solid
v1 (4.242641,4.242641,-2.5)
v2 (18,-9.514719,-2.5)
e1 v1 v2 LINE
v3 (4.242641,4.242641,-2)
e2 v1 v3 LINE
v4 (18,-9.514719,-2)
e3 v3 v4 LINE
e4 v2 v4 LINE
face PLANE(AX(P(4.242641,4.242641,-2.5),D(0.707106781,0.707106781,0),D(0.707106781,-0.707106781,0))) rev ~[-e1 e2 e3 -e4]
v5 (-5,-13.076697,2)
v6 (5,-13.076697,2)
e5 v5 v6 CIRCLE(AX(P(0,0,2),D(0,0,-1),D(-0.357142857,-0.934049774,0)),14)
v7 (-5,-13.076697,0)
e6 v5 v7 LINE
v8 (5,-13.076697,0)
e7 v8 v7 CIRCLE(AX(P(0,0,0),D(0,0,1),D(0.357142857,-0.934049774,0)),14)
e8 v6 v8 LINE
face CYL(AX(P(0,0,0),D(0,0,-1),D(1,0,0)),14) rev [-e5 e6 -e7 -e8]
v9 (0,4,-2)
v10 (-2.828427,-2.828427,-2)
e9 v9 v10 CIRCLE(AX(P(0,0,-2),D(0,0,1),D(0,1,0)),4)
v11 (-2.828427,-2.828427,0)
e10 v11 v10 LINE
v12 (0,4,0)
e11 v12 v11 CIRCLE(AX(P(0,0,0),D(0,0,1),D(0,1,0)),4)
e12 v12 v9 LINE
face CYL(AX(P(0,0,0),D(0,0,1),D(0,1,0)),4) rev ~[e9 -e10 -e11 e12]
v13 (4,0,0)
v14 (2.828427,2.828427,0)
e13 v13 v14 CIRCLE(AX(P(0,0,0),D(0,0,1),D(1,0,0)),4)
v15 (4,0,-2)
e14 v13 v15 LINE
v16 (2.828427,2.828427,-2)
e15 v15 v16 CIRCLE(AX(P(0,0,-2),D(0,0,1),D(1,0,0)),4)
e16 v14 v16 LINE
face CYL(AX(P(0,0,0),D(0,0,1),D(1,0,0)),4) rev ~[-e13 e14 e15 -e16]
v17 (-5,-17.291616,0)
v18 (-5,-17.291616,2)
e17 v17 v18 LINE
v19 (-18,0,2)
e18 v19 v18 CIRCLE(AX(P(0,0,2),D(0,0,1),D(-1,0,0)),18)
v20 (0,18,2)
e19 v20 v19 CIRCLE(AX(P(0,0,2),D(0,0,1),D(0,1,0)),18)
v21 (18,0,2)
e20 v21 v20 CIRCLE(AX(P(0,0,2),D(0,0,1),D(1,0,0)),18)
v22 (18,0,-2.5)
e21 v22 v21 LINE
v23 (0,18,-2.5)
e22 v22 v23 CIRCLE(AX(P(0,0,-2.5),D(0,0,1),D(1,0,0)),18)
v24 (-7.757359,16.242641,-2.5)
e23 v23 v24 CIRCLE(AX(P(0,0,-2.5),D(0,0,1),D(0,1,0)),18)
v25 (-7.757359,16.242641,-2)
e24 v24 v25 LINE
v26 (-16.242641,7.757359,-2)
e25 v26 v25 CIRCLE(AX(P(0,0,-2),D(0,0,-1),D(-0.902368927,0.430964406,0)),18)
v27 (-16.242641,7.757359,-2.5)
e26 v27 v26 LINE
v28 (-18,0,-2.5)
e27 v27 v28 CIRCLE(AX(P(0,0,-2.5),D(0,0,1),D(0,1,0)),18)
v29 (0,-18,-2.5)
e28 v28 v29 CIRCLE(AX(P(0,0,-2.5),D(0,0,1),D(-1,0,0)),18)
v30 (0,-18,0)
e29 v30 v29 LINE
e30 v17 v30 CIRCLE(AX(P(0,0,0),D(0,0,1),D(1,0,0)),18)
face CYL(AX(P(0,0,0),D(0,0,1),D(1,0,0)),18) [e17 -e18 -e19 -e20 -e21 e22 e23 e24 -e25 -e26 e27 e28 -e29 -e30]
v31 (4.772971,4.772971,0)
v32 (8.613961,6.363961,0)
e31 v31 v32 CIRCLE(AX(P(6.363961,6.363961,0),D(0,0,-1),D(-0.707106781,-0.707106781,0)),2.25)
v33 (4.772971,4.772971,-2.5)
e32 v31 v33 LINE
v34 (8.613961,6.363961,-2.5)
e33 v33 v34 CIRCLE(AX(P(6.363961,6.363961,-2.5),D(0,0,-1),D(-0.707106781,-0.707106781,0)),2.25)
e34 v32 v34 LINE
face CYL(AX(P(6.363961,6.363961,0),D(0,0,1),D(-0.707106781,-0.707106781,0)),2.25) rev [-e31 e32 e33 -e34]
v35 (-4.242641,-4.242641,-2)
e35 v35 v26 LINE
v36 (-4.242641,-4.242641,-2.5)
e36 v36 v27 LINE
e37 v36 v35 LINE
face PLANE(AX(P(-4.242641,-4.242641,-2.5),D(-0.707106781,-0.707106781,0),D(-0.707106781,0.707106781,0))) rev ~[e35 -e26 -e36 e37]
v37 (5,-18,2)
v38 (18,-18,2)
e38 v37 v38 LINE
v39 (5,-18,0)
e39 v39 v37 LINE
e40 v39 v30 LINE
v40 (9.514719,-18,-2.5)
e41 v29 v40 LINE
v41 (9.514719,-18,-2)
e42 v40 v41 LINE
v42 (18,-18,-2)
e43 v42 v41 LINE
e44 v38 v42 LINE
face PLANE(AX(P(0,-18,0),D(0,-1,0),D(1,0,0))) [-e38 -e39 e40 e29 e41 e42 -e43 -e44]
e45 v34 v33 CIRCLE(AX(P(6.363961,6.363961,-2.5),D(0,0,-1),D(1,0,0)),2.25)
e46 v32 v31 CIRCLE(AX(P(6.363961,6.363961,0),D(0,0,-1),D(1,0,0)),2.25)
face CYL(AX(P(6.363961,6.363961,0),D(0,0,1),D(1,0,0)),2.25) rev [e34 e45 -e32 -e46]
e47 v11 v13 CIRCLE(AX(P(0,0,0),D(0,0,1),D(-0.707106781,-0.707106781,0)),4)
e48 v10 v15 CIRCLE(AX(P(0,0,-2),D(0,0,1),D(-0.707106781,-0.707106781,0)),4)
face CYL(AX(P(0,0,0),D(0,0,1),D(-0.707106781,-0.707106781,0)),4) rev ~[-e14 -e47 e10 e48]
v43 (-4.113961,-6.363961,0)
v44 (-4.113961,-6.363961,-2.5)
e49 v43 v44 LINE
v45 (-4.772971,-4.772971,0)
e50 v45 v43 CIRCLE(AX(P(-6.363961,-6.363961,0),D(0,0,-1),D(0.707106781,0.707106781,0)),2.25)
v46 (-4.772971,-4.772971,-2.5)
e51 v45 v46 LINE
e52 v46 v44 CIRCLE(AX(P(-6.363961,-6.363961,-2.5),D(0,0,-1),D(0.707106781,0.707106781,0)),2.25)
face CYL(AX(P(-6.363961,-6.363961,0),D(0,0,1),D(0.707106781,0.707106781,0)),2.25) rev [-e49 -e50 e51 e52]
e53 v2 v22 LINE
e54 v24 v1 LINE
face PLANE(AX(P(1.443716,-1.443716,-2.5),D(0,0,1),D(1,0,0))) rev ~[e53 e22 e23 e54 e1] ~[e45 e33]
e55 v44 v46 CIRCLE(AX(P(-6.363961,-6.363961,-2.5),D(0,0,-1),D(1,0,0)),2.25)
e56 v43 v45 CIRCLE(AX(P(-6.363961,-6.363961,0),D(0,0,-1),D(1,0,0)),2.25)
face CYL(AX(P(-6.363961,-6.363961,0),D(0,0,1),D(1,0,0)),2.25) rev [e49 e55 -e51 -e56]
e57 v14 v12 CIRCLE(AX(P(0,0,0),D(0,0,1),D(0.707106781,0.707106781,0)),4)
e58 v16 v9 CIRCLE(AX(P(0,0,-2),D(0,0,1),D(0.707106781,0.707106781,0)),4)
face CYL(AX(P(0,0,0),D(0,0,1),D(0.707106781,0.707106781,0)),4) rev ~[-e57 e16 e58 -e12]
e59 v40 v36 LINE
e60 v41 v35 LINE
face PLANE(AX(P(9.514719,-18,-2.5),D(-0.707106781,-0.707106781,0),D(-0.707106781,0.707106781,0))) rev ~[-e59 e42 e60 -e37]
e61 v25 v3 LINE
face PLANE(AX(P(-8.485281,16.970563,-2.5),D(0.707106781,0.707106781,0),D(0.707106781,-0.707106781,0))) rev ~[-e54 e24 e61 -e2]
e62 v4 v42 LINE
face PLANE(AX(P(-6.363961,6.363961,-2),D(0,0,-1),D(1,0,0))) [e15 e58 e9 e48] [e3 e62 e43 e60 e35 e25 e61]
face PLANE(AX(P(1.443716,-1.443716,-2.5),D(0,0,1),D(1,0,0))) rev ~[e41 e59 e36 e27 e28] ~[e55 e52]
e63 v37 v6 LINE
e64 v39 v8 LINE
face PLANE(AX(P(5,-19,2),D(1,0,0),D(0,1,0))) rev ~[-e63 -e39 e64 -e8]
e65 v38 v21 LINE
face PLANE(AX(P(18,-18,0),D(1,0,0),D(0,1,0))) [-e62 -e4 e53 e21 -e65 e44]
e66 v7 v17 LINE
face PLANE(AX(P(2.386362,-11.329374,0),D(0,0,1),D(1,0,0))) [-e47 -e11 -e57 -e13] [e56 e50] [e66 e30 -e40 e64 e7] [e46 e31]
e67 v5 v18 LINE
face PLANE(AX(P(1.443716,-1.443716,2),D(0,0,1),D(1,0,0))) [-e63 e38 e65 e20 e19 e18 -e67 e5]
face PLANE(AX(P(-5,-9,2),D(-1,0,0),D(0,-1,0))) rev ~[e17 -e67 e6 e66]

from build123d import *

# Parameters (mm, degrees)
F0_R     = 14
F1_DEPTH = 2
F2_DEPTH = 2.5
F3_DEPTH = 3
F5_DEPTH = 0.5
F7_DEPTH = 2


# Not quite as in the source:
# - a feature names something its author has since deleted; it is built from what else it names


with BuildPart() as f1:
    # F0 (on Top) → F1 (new body)
    with BuildSketch(Plane.XY):
        with BuildLine():
            Line((18, -18), (18, 0))
            ThreePointArc((18, 0), (12.7279220614, 12.7279220614), (0, 18))
            ThreePointArc((0, 18), (-12.7279220614, 12.7279220614), (-18, 0))
            ThreePointArc((-18, 0), (-12.7279220614, -12.7279220614), (0, -18))
            Line((0, -18), (18, -18))
        make_face()
        Circle(F0_R, mode=Mode.SUBTRACT)
    extrude(amount=F1_DEPTH)

    # F0 (on Top) → F2 (join)
    with BuildSketch(Plane.XY):
        with BuildLine():
            Line((18, -18), (18, 0))
            ThreePointArc((18, 0), (12.7279220614, 12.7279220614), (0, 18))
            ThreePointArc((0, 18), (-12.7279220614, 12.7279220614), (-18, 0))
            ThreePointArc((-18, 0), (-12.7279220614, -12.7279220614), (0, -18))
            Line((0, -18), (18, -18))
        make_face()
        Circle(F0_R, mode=Mode.SUBTRACT)
        Circle(F0_R)
        with BuildLine():
            ThreePointArc((-4.1139610307, -6.3639610307), (-8.4426899788, -7.2249987535), (-4.772970773, -4.772970773))
            ThreePointArc((-4.772970773, -4.772970773), (-4.2852320825, -5.5029233079), (-4.1139610307, -6.3639610307))
        make_face(mode=Mode.SUBTRACT)
        with BuildLine():
            ThreePointArc((2.8284271247, 2.8284271247), (3.69551813, 1.5307337295), (4, 0))
            ThreePointArc((4, 0), (1.5307337295, -3.69551813), (-2.8284271247, -2.8284271247))
            ThreePointArc((-2.8284271247, -2.8284271247), (-3.69551813, 1.5307337295), (0, 4))
            ThreePointArc((0, 4), (1.5307337295, 3.69551813), (2.8284271247, 2.8284271247))
        make_face(mode=Mode.SUBTRACT)
        with BuildLine():
            ThreePointArc((8.6139610307, 6.3639610307), (7.2249987535, 4.2852320825), (4.772970773, 4.772970773))
            ThreePointArc((4.772970773, 4.772970773), (5.5029233079, 8.4426899788), (8.6139610307, 6.3639610307))
        make_face(mode=Mode.SUBTRACT)
        with BuildLine():
            ThreePointArc((-2.8284271247, -2.8284271247), (1.5307337295, -3.69551813), (4, 0))
            Line((4, 0), (0, 0))
            Line((0, 0), (-2.8284271247, -2.8284271247))
        make_face()
        with BuildLine():
            Line((0, 0), (2.8284271247, 2.8284271247))
            ThreePointArc((2.8284271247, 2.8284271247), (1.5307337295, 3.69551813), (0, 4))
            Line((0, 4), (0, 0))
        make_face()
        with BuildLine():
            ThreePointArc((0, 4), (-3.69551813, 1.5307337295), (-2.8284271247, -2.8284271247))
            Line((-2.8284271247, -2.8284271247), (0, 0))
            Line((0, 0), (0, 4))
        make_face()
        with BuildLine():
            Line((0, 0), (4, 0))
            ThreePointArc((4, 0), (3.69551813, 1.5307337295), (2.8284271247, 2.8284271247))
            Line((2.8284271247, 2.8284271247), (0, 0))
        make_face()
    extrude(amount=-F2_DEPTH)

    # F0 (on Top) → F3 (cut)
    with BuildSketch(Plane.XY):
        with BuildLine():
            ThreePointArc((-2.8284271247, -2.8284271247), (1.5307337295, -3.69551813), (4, 0))
            Line((4, 0), (0, 0))
            Line((0, 0), (-2.8284271247, -2.8284271247))
        make_face()
        with BuildLine():
            Line((0, 0), (4, 0))
            ThreePointArc((4, 0), (3.69551813, 1.5307337295), (2.8284271247, 2.8284271247))
            Line((2.8284271247, 2.8284271247), (0, 0))
        make_face()
        with BuildLine():
            Line((0, 0), (2.8284271247, 2.8284271247))
            ThreePointArc((2.8284271247, 2.8284271247), (1.5307337295, 3.69551813), (0, 4))
            Line((0, 4), (0, 0))
        make_face()
        with BuildLine():
            ThreePointArc((0, 4), (-3.69551813, 1.5307337295), (-2.8284271247, -2.8284271247))
            Line((-2.8284271247, -2.8284271247), (0, 0))
            Line((0, 0), (0, 4))
        make_face()
    extrude(amount=-F3_DEPTH, mode=Mode.SUBTRACT)

    # F4 (on face) → F5 (cut)
    with BuildSketch(Plane(origin=(0, 0, -2.5), x_dir=(1, 0, 0), z_dir=(0, 0, -1))):
        Polygon((4.2426406871, -4.2426406871), (0, 0), (-4.2426406871, 4.2426406871), (-16.9705627485, -8.4852813742), (-8.4852813742, -16.9705627485), align=None)
        Polygon((8.4852813742, 0), (0, 0), (4.2426406871, -4.2426406871), align=None)
        with BuildLine():
            Line((-2.8284271247, 2.8284271247), (0, 0))
            Line((0, 0), (4, 0))
            ThreePointArc((4, 0), (1.5307337295, 3.69551813), (-2.8284271247, 2.8284271247))
        make_face()
        with BuildLine():
            Line((-4.2426406871, 4.2426406871), (-2.8284271247, 2.8284271247))
            ThreePointArc((-2.8284271247, 2.8284271247), (1.5307337295, 3.69551813), (4, 0))
            Line((4, 0), (8.4852813742, 0))
            Line((8.4852813742, 0), (18, 9.5147186258))
            Line((18, 9.5147186258), (18, 18))
            Line((18, 18), (9.5147186258, 18))
            Line((9.5147186258, 18), (-4.2426406871, 4.2426406871))
        make_face()
    extrude(amount=-F5_DEPTH, mode=Mode.SUBTRACT)

    # F6 (on face) → F7 (cut)
    with BuildSketch(Plane.XY.offset(2)):
        with BuildLine():
            Line((5, -9), (0, -9))
            Line((0, -9), (0, -14))
            ThreePointArc((0, -14), (2.542267135, -13.7672392953), (5, -13.0766968306))
            Line((5, -13.0766968306), (5, -9))
        make_face()
        with BuildLine():
            Line((0, -14), (0, -9))
            Line((0, -9), (-5, -9))
            Line((-5, -9), (-5, -13.0766968306))
            ThreePointArc((-5, -13.0766968306), (-2.542267135, -13.7672392953), (0, -14))
        make_face()
        with BuildLine():
            Line((5, -18), (0, -18))
            ThreePointArc((0, -18), (-2.5249657043, -17.8220242451), (-5, -17.2916164658))
            Line((-5, -17.2916164658), (-5, -19))
            Line((-5, -19), (5, -19))
            Line((5, -19), (5, -18))
        make_face()
        with BuildLine():
            ThreePointArc((5, -13.0766968306), (2.542267135, -13.7672392953), (0, -14))
            Line((0, -14), (0, -18))
            Line((0, -18), (5, -18))
            Line((5, -18), (5, -13.0766968306))
        make_face()
        with BuildLine():
            Line((0, -18), (0, -14))
            ThreePointArc((0, -14), (-2.542267135, -13.7672392953), (-5, -13.0766968306))
            Line((-5, -13.0766968306), (-5, -17.2916164658))
            ThreePointArc((-5, -17.2916164658), (-2.5249657043, -17.8220242451), (0, -18))
        make_face()
    extrude(amount=-F7_DEPTH, mode=Mode.SUBTRACT)


solid = f1.part
